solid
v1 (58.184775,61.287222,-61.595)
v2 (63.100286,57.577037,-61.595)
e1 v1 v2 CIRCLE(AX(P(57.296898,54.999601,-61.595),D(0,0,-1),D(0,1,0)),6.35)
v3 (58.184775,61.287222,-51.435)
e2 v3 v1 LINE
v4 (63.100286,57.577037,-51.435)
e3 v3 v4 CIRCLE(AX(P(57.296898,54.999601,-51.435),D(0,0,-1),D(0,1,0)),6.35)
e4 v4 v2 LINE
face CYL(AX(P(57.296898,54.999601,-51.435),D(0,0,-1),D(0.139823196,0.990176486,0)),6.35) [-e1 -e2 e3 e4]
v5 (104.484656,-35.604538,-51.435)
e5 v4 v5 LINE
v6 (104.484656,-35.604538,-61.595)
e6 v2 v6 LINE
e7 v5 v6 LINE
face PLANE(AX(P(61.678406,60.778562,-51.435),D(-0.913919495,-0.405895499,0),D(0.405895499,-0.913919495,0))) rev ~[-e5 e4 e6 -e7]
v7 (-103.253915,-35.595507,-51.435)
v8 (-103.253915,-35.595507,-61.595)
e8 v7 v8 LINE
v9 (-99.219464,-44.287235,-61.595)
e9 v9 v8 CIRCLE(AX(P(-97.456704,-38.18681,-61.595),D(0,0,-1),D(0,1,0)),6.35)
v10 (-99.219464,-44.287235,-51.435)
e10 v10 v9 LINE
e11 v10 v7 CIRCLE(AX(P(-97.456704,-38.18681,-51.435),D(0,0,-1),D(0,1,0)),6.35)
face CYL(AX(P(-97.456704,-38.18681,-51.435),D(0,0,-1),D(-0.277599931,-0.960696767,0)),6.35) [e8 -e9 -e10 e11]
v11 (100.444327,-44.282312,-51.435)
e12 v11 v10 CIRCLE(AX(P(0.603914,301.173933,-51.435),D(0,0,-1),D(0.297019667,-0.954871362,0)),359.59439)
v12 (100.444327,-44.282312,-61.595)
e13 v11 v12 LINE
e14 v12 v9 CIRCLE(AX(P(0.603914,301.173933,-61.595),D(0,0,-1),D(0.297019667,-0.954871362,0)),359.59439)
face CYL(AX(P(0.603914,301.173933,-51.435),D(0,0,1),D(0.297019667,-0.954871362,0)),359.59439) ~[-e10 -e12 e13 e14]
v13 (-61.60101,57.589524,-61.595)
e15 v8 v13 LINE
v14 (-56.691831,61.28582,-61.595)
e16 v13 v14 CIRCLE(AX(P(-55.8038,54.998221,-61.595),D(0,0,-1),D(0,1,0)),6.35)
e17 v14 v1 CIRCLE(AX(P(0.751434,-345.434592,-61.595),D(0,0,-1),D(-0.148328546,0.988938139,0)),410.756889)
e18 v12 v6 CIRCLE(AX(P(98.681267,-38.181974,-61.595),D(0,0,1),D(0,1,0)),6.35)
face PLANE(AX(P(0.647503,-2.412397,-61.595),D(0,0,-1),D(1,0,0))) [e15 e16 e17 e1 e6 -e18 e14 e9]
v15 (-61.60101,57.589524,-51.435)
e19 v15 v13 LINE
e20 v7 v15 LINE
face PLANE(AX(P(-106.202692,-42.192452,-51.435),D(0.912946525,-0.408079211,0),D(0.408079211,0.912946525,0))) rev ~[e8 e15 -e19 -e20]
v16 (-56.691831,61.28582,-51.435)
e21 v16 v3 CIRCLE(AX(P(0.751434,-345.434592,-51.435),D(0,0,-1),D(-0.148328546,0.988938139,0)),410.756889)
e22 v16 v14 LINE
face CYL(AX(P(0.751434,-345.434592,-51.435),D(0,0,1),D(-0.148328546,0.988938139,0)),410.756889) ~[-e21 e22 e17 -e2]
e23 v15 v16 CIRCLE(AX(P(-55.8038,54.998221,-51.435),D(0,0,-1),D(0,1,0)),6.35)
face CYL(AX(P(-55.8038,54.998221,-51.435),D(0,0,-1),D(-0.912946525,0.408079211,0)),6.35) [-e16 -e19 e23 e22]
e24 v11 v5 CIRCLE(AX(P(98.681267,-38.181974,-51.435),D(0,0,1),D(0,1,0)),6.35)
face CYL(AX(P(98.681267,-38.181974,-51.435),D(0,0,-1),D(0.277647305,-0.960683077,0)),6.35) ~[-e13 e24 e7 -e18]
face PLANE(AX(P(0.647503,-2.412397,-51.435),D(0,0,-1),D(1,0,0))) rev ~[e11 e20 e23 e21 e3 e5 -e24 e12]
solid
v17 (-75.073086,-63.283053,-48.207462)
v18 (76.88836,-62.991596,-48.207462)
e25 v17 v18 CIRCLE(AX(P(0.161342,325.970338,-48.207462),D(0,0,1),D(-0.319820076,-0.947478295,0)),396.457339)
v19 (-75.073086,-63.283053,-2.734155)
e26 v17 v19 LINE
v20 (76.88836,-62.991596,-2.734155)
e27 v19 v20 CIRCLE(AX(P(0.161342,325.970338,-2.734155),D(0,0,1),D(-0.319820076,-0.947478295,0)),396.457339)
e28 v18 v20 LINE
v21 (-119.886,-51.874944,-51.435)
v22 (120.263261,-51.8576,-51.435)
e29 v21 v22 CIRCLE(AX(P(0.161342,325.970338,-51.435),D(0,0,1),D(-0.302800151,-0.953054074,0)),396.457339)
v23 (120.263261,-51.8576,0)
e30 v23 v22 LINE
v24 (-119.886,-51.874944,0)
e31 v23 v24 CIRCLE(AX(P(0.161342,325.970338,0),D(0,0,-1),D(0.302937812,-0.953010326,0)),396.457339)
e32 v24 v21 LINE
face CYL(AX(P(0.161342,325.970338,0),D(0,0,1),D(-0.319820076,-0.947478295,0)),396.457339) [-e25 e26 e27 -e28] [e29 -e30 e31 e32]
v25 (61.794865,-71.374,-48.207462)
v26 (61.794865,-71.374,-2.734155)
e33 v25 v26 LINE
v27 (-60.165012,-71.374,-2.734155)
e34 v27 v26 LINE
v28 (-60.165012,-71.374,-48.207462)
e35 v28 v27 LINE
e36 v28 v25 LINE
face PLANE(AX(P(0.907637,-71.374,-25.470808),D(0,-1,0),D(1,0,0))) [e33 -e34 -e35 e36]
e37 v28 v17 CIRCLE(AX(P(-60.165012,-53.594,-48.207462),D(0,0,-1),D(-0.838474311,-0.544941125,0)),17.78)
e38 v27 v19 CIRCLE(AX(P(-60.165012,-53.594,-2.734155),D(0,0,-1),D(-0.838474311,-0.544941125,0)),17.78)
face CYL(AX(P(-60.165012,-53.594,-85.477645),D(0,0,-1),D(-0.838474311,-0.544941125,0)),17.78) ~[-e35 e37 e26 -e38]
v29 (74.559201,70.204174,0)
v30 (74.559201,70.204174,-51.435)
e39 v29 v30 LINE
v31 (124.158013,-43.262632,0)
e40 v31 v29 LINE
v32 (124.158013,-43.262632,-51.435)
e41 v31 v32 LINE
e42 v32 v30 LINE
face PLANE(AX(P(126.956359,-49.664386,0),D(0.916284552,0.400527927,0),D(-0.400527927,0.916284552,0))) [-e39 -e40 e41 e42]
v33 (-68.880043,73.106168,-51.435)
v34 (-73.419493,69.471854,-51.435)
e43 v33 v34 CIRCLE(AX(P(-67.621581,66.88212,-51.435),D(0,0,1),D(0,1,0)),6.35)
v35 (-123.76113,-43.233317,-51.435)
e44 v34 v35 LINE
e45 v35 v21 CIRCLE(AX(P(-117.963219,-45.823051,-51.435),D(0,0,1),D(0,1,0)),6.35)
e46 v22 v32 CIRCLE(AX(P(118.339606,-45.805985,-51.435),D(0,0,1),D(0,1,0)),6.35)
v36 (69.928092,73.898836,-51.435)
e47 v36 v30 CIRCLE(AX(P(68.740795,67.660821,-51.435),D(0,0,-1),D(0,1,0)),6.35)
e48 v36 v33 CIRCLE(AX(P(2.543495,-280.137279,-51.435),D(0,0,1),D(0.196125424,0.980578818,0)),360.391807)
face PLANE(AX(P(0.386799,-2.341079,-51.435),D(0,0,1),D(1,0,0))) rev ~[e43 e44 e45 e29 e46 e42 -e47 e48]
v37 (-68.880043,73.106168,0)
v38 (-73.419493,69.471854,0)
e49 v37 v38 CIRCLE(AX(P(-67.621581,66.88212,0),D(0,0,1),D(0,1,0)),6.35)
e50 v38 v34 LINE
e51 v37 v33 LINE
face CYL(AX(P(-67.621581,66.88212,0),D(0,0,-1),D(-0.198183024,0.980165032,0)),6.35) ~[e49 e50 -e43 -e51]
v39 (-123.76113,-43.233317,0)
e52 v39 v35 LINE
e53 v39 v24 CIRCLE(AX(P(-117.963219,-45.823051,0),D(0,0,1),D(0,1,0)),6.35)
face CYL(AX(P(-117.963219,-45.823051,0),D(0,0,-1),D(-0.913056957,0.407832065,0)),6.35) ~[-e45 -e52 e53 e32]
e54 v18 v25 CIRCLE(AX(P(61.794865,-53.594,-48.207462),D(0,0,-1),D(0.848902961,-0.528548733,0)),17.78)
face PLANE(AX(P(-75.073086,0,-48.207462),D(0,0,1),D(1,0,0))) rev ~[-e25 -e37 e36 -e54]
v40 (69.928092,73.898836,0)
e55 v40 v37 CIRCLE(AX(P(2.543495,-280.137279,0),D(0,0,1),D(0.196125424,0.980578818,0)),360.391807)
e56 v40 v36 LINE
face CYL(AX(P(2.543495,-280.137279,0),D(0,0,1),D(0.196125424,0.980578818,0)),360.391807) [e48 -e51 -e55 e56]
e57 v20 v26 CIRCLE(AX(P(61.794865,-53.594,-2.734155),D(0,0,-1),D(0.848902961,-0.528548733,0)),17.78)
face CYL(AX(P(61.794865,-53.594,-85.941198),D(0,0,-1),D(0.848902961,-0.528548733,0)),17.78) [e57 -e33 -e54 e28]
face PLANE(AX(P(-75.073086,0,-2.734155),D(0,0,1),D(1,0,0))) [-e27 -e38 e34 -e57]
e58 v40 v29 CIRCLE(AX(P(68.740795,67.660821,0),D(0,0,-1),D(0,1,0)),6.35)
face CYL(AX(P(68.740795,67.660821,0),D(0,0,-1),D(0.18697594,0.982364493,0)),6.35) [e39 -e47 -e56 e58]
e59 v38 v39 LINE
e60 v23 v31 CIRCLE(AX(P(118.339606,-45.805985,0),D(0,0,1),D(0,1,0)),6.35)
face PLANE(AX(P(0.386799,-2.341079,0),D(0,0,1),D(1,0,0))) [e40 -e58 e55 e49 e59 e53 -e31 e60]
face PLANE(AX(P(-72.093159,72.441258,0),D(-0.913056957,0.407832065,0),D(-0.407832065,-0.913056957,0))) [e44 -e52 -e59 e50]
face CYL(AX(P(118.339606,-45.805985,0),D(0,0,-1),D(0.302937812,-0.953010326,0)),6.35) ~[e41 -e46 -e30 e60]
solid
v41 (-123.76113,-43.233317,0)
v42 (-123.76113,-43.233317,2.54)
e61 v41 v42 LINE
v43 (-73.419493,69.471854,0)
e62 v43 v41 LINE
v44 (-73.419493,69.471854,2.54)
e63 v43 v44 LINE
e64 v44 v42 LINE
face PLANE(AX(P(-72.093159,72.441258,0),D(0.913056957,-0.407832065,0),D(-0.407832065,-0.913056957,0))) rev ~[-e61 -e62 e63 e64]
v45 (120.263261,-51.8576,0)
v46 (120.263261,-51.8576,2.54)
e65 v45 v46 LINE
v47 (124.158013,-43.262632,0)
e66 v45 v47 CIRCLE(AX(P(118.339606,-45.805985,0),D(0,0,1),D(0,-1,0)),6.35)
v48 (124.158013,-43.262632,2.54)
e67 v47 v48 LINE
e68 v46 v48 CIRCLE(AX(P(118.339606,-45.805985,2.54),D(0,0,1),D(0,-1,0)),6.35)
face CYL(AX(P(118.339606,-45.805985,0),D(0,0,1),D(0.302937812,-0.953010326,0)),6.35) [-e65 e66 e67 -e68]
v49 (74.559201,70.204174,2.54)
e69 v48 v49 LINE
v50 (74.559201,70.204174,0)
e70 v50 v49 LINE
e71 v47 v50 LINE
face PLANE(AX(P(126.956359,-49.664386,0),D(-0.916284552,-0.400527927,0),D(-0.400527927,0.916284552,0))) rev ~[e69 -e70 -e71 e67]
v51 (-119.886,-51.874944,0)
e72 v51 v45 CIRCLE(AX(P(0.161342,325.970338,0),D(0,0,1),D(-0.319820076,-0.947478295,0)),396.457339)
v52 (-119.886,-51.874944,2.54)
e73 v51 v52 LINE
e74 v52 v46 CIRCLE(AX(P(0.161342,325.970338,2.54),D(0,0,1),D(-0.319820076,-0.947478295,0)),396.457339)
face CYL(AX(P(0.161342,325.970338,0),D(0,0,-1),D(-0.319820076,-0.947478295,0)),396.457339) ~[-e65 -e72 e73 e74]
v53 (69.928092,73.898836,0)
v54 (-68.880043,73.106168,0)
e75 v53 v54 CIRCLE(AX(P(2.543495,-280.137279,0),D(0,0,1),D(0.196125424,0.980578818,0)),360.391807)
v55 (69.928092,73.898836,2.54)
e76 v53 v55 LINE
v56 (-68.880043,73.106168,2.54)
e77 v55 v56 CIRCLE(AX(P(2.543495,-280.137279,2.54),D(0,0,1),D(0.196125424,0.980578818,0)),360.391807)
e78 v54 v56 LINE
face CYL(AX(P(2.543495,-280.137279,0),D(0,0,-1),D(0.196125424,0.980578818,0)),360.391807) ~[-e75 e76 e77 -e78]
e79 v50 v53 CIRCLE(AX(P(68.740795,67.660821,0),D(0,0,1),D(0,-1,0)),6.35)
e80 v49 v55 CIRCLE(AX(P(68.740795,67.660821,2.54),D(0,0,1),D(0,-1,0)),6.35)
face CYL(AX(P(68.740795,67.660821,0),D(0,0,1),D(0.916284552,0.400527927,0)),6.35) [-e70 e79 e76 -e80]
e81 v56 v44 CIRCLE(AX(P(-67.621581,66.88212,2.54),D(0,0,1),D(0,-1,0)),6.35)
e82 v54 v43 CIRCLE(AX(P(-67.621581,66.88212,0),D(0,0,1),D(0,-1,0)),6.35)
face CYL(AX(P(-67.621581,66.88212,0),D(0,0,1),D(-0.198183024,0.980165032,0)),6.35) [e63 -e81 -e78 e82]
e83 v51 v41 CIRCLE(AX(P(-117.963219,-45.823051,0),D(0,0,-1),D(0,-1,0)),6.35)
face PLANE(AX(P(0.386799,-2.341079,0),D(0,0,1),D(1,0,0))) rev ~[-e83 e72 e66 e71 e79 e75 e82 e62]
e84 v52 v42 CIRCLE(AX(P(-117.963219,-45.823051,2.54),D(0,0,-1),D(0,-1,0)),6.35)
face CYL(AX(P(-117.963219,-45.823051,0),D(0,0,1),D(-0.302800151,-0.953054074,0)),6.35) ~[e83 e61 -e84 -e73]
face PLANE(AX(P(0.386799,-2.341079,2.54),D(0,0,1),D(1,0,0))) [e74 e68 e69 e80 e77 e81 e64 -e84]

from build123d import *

# Parameters (mm, degrees)
F1_DEPTH    = 51.435
F3_DEPTH    = 10.16
F5_DEPTH    = 2.54
F6_R        = 6.35
F6_2_R      = 6.35
F6_3_R      = 6.35
F7_W        = 151.9614458084
F7_H        = 45.4733071383
F8_DEPTH    = 71.374
F9_T1_DEPTH = 120.0136733796
F9_T3_DEPTH = 120.9407803299


# Not quite as in the source:
# - a fillet or chamfer that OpenCascade refuses, or shapes differently, is made with other operations: its cross-section is extruded or revolved along the edge and cut away or added


with BuildPart() as f1:
    # F0 (on Top) → F1 (new body)
    with BuildSketch(Plane.XY):
        with BuildLine():
            ThreePointArc((73.2254907489, 73.2552930713), (0.5247097559, 80.2488736751), (-72.0931589603, 72.4412575364))
            Line((-72.0931589603, 72.4412575364), (-126.6336739063, -49.6643856168))
            ThreePointArc((-126.6336739063, -49.6643856168), (0.1613423228, -70.4870011046), (126.956358552, -49.6643856168))
            Line((126.956358552, -49.6643856168), (73.2254907489, 73.2552930713))
        make_face()
    extrude(amount=-F1_DEPTH)

    # F6
    f6_edges = [f1.edges().sort_by_distance(p)[0] for p in [
        (-126.633674, -49.664386, -25.7175),
        (126.956359, -49.664386, -25.7175),
        (73.225491, 73.255293, -25.7175),
        (-72.093159, 72.441258, -25.7175),
    ]]
    fillet(f6_edges, radius=F6_R)

    # F7 (on Front) → F8 (join)
    with BuildSketch(Plane.XZ):
        with Locations((0.9076371789, -25.4708082648)):
            Rectangle(F7_W, F7_H)
    extrude(amount=F8_DEPTH)

    # F9: fillet of radius 17.78 on 2 edges, made by hand

    # F9_s2 → F9_t1 (cut)
    with BuildSketch(Plane.XY.offset(-85.4776449546)):
        with BuildLine():
            ThreePointArc((-75.0730857253, -63.2830532058), (-68.6460806292, -69.2208961409), (-60.1650124771, -71.374))
            Line((-60.1650124771, -71.374), (-75.0730857253, -71.374))
            Line((-75.0730857253, -71.374), (-75.0730857253, -63.2830532058))
        make_face()
    extrude(amount=F9_T1_DEPTH, mode=Mode.SUBTRACT)

    # F9_s4 → F9_t3 (cut)
    with BuildSketch(Plane.XY.offset(-85.9411984297)):
        with BuildLine():
            ThreePointArc((76.8883600831, -62.9915964801), (70.427337124, -69.1377715085), (61.7948654448, -71.374))
            Line((61.7948654448, -71.374), (76.8883600831, -71.374))
            Line((76.8883600831, -71.374), (76.8883600831, -62.9915964801))
        make_face()
    extrude(amount=F9_T3_DEPTH, mode=Mode.SUBTRACT)


with BuildPart() as f3:
    # F2 (on face) → F3 (new body)
    with BuildSketch(Plane(origin=(0, 0, -51.435), x_dir=(1, 0, 0), z_dir=(0, 0, -1))):
        with BuildLine():
            ThreePointArc((107.4105203152, 42.1924516559), (0.6039142609, 58.4204568292), (-106.2026917934, 42.1924516559))
            Line((-106.2026917934, 42.1924516559), (-60.175538063, -60.7785619795))
            ThreePointArc((-60.175538063, -60.7785619795), (0.751433894, -65.3222976326), (61.6784058511, -60.7785619795))
            Line((61.6784058511, -60.7785619795), (107.4105203152, 42.1924516559))
        make_face()
    extrude(amount=F3_DEPTH)

    # F6#2
    f6_2_edges = [f3.edges().sort_by_distance(p)[0] for p in [
        (-106.202692, -42.192452, -56.515),
        (107.41052, -42.192452, -56.515),
        (61.678406, 60.778562, -56.515),
        (-60.175538, 60.778562, -56.515),
    ]]
    fillet(f6_2_edges, radius=F6_2_R)


with BuildPart() as f5:
    # F4 (on face) → F5 (new body)
    with BuildSketch(Plane.XY):
        with BuildLine():
            ThreePointArc((-126.6336739063, -49.6643856168), (0.1613423228, -70.4870011046), (126.956358552, -49.6643856168))
            Line((126.956358552, -49.6643856168), (73.2254907489, 73.2552930713))
            ThreePointArc((73.2254907489, 73.2552930713), (0.5247097559, 80.2488736751), (-72.0931589603, 72.4412575364))
            Line((-72.0931589603, 72.4412575364), (-126.6336739063, -49.6643856168))
        make_face()
    extrude(amount=F5_DEPTH)

    # F6#3
    f6_3_edges = [f5.edges().sort_by_distance(p)[0] for p in [
        (-126.633674, -49.664386, 1.27),
        (126.956359, -49.664386, 1.27),
        (73.225491, 73.255293, 1.27),
        (-72.093159, 72.441258, 1.27),
    ]]
    fillet(f6_3_edges, radius=F6_3_R)


solid = Compound([f1.part, f3.part, f5.part])
